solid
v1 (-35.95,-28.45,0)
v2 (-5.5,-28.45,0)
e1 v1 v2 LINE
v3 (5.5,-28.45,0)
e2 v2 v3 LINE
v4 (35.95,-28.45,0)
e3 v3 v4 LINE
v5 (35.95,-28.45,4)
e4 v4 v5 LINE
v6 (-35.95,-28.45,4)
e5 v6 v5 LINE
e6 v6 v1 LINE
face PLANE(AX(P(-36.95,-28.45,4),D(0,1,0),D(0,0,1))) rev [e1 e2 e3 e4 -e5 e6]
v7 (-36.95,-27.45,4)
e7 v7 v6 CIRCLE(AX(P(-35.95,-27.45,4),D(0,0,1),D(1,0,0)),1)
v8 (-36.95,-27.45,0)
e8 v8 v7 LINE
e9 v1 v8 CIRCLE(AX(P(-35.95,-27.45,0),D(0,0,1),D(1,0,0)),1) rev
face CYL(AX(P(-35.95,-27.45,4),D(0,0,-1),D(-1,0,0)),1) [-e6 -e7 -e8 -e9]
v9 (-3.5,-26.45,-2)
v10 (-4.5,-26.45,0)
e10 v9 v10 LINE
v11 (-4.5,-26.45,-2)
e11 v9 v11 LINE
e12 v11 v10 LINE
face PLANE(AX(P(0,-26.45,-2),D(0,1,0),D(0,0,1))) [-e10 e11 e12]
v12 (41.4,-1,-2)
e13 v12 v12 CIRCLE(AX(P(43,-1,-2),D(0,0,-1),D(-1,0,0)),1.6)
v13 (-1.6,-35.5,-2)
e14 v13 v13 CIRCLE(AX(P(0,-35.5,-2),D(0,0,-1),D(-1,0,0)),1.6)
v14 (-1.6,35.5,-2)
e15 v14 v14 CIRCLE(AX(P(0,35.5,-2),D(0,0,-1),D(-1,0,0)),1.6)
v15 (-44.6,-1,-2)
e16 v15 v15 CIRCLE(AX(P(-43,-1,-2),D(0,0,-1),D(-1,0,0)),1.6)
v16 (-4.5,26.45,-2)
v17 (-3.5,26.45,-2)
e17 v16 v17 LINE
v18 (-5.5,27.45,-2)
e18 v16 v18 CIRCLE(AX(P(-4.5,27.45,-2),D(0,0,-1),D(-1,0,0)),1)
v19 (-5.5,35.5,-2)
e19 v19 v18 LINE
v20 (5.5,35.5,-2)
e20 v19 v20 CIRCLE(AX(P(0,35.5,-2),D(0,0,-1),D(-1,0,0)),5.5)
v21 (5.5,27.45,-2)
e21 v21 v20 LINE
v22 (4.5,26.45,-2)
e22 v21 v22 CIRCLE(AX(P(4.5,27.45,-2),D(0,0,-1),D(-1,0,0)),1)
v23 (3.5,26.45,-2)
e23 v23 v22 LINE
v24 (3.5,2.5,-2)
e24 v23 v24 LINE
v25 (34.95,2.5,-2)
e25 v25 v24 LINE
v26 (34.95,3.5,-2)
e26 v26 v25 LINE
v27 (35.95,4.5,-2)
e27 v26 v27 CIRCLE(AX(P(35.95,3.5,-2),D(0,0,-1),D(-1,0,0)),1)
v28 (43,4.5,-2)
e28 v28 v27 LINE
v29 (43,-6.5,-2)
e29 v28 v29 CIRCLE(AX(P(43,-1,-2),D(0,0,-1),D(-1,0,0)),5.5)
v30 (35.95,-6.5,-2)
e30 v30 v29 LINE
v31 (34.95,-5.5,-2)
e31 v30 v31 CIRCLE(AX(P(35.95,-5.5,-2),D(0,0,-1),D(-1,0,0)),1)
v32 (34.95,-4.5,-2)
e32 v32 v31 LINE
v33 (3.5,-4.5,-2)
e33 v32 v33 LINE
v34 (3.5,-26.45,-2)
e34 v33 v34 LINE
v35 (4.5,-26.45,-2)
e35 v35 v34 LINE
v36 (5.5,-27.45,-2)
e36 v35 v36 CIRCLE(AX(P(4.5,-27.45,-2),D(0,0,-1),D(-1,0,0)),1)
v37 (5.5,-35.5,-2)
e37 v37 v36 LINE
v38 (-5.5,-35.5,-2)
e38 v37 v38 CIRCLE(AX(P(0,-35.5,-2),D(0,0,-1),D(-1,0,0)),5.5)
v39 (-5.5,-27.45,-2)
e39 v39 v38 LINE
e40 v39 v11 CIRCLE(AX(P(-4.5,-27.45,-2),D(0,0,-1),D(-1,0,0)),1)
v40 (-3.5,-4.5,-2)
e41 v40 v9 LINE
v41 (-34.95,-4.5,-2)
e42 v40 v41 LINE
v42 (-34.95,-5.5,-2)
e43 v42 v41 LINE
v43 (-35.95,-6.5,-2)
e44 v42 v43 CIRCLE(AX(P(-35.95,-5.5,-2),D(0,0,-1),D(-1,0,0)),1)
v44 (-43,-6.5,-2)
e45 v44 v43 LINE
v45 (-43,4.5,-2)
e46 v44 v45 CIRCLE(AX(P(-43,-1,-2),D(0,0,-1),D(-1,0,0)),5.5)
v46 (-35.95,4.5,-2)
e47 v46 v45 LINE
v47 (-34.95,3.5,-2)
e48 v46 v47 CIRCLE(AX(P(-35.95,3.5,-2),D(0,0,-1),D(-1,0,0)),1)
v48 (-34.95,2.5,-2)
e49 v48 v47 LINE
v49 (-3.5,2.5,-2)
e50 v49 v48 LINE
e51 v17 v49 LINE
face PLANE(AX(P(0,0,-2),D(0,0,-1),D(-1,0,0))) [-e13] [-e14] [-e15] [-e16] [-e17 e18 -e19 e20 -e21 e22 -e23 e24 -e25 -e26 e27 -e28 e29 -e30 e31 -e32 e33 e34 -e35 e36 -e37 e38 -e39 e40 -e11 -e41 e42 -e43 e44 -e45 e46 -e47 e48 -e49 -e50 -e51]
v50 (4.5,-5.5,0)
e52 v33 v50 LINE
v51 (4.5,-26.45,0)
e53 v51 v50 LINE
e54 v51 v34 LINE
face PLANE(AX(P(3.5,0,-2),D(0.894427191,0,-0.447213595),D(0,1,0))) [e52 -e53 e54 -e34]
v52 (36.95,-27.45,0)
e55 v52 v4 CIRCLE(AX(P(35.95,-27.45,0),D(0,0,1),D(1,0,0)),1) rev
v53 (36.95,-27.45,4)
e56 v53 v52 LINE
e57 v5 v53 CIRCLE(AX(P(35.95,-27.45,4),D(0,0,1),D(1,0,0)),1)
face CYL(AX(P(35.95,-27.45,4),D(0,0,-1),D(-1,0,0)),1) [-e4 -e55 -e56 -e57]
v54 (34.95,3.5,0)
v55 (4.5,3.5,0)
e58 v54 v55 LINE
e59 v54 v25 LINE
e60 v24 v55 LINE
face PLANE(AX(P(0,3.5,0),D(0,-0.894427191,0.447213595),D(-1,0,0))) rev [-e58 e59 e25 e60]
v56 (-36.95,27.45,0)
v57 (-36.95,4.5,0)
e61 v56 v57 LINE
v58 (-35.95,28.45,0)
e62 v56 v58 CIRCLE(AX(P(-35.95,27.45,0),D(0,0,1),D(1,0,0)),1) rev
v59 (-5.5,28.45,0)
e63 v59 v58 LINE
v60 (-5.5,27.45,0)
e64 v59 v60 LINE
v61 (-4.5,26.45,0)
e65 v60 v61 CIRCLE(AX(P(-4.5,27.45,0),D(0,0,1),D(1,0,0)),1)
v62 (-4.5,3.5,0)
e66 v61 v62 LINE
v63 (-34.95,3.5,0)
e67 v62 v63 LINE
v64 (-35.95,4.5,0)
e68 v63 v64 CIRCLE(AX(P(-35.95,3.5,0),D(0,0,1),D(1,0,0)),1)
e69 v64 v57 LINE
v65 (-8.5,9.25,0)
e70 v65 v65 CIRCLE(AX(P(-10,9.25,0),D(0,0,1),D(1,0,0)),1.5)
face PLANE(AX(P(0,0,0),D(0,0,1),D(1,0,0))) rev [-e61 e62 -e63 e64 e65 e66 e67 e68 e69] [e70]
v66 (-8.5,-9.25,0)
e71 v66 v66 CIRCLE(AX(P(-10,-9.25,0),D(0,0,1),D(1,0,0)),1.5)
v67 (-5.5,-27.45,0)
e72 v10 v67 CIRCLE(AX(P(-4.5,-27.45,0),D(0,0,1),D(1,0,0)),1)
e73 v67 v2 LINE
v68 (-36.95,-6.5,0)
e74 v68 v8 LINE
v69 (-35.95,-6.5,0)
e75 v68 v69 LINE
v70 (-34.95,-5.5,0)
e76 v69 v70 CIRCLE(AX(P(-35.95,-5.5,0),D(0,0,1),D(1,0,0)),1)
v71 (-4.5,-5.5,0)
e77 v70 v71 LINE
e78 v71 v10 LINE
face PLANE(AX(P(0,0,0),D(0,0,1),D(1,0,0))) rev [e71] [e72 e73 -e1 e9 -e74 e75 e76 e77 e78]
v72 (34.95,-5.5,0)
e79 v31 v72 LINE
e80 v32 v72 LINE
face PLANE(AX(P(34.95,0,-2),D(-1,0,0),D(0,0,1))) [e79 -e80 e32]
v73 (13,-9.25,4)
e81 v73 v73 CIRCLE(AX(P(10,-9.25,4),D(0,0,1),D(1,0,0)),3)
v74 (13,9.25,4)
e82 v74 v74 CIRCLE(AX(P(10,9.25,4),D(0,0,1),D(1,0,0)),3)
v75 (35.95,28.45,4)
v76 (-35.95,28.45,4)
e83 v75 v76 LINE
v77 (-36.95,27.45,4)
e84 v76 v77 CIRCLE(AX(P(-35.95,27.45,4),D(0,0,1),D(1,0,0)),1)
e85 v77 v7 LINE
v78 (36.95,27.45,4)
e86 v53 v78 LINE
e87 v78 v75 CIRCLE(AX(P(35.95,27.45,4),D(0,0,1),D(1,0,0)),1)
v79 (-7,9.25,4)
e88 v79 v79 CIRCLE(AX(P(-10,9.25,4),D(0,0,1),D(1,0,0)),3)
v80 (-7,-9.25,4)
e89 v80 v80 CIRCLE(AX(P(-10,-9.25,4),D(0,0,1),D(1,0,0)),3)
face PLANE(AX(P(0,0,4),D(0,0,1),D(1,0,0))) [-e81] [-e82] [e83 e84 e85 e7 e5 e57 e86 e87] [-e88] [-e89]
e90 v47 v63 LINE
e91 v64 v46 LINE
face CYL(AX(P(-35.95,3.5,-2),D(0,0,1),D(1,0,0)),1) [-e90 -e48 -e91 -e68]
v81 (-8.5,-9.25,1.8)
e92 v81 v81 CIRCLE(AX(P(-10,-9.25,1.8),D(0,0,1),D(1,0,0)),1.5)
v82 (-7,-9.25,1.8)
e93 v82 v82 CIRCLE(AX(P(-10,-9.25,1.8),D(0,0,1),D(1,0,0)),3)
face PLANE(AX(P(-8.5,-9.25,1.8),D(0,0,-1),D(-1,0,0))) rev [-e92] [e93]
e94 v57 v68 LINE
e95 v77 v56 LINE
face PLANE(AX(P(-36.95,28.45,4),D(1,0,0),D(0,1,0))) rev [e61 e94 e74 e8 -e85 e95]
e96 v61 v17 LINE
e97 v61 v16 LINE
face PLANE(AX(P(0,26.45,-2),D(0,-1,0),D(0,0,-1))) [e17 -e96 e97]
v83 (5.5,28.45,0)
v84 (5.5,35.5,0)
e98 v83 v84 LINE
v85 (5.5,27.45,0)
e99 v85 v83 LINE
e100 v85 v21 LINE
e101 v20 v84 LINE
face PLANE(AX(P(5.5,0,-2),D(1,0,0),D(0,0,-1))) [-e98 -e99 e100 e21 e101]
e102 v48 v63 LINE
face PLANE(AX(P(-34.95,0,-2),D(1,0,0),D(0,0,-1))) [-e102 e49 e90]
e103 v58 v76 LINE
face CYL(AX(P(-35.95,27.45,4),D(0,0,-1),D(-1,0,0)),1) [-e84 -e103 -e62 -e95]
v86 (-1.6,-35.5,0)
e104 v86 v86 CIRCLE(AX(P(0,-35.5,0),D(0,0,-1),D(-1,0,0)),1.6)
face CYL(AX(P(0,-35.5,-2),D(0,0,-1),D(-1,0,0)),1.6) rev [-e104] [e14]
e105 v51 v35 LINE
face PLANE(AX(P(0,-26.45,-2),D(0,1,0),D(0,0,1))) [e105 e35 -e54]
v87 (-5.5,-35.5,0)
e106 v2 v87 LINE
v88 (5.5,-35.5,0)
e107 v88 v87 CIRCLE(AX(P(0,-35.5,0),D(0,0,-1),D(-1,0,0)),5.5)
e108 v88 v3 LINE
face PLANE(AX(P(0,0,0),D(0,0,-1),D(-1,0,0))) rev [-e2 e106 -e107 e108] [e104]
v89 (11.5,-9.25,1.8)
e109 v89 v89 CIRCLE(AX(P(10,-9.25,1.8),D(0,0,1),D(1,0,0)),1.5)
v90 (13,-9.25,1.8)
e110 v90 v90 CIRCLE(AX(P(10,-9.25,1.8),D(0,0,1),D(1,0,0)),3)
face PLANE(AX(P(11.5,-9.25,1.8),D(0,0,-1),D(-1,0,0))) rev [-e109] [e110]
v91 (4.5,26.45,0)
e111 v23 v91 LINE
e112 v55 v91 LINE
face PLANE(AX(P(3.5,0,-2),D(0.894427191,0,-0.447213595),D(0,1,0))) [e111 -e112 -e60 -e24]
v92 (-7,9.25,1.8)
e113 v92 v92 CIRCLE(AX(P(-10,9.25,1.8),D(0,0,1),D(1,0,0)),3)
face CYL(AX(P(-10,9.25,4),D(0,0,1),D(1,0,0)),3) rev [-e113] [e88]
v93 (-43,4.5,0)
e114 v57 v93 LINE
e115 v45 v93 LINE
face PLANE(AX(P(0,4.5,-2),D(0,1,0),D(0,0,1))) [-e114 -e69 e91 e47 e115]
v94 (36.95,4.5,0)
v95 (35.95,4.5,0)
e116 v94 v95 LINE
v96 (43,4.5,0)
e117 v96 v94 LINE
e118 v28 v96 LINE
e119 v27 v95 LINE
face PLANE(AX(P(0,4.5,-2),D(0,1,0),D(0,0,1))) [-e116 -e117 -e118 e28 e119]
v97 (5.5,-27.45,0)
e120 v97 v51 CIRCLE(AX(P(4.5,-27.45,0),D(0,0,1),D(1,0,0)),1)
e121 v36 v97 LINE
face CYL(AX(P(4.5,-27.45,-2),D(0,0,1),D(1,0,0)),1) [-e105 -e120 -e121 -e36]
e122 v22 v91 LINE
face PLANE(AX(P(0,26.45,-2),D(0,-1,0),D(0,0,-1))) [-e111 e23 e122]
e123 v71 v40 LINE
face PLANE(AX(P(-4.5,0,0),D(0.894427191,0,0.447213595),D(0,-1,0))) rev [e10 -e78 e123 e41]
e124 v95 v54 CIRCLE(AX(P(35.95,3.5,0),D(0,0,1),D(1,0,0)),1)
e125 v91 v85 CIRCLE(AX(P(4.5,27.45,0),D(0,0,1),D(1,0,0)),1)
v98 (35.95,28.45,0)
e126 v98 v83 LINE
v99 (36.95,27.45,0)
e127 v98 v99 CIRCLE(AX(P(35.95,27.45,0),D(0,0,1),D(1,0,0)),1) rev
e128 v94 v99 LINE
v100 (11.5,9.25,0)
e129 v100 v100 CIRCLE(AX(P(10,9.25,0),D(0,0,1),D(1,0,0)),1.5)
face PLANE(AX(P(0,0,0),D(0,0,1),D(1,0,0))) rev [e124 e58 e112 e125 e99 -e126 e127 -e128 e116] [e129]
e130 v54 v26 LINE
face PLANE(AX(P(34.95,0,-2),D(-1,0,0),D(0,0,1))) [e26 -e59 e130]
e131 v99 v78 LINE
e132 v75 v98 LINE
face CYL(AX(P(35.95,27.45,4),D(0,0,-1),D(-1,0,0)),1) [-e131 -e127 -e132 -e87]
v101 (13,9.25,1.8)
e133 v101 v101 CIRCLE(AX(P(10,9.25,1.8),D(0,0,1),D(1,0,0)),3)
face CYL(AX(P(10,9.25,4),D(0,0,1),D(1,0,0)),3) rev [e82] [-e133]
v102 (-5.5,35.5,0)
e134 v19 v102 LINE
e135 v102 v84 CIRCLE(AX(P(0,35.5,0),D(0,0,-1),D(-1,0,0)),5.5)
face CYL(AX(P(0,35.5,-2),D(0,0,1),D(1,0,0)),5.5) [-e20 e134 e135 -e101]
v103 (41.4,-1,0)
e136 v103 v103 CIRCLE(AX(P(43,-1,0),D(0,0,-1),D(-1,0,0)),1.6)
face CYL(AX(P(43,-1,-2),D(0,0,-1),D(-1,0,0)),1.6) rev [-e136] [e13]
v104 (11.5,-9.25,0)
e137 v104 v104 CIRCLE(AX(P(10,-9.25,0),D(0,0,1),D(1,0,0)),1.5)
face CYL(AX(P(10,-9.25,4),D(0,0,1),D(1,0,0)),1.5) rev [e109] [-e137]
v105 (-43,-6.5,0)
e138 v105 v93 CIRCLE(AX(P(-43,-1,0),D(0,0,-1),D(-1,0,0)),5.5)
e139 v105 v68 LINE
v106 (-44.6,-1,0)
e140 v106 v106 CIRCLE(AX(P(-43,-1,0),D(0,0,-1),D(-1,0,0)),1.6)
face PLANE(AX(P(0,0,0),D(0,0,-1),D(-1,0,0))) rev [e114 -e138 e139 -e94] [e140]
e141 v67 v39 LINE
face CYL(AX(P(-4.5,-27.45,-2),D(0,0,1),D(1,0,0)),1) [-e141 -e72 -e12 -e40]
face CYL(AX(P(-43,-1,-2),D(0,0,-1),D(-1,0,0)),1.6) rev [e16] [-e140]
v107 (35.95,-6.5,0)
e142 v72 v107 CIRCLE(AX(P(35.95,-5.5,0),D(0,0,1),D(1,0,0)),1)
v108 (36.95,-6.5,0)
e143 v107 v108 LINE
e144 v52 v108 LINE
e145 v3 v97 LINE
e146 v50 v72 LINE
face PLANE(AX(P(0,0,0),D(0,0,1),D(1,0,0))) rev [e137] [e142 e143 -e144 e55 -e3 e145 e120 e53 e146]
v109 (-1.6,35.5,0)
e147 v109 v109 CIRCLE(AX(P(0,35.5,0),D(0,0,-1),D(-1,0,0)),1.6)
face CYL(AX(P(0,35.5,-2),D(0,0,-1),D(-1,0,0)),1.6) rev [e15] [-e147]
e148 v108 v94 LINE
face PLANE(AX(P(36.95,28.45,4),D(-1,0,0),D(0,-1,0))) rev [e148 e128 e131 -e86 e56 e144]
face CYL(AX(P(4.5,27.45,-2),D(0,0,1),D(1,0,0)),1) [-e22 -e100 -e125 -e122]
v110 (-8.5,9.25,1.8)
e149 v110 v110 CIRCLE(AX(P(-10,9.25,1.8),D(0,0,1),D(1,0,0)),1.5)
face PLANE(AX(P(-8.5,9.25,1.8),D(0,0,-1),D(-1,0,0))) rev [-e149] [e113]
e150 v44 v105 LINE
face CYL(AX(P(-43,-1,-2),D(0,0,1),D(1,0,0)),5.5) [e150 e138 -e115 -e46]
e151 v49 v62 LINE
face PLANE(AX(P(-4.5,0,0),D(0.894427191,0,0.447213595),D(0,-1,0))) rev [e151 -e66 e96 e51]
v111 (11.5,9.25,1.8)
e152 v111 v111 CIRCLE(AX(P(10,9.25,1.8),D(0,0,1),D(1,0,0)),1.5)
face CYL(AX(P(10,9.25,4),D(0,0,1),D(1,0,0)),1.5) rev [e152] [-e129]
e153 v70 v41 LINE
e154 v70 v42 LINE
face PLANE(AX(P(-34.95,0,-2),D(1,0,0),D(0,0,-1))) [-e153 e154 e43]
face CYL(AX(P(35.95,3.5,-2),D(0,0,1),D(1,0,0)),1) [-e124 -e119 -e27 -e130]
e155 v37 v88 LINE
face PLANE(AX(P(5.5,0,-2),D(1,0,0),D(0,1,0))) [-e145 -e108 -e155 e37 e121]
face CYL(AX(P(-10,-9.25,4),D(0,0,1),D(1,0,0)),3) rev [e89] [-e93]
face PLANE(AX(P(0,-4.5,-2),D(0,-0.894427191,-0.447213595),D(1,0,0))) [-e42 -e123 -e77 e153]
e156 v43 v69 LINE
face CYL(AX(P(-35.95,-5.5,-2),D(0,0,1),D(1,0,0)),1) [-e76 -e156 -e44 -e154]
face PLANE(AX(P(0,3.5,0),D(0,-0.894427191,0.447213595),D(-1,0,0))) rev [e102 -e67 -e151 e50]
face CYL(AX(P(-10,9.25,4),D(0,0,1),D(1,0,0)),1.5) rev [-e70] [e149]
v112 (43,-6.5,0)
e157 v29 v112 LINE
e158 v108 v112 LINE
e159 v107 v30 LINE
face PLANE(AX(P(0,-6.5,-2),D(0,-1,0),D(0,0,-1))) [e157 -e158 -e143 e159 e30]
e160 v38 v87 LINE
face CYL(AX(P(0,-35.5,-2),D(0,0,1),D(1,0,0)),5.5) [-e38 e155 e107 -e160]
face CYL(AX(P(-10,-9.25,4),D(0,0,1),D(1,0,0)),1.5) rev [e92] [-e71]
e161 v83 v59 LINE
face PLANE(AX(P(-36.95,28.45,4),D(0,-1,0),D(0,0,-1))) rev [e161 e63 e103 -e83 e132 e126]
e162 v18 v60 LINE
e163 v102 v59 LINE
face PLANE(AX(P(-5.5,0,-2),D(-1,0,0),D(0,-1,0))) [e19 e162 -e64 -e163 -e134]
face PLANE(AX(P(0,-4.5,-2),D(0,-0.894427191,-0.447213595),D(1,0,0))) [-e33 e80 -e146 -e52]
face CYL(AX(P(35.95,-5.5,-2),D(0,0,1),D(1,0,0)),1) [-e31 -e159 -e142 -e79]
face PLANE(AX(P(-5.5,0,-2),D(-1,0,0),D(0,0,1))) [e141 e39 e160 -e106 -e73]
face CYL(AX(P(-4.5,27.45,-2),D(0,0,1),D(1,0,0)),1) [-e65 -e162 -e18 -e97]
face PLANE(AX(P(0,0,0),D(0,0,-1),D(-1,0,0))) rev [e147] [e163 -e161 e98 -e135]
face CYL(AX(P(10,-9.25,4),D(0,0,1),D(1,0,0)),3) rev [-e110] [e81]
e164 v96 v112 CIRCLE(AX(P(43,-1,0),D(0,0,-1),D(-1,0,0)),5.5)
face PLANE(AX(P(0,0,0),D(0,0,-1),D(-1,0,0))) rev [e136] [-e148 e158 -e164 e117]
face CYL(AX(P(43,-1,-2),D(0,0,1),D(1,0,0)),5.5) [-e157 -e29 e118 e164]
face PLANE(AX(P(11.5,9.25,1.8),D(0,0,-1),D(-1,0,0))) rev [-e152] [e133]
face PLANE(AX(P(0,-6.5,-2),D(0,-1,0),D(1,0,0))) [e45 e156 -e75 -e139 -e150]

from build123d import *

# Parameters (mm, degrees)
SKETCH_1_W                = 73.9
SKETCH_1_H                = 56.9
EXTRUDE_1_DEPTH           = 4
HOLE_WIZARD_1_D           = 3
HOLE_WIZARD_1_CBORE_D     = 6
HOLE_WIZARD_1_CBORE_DEPTH = 2.2
SKETCH_4_W                = 7
SKETCH_4_H                = 25.95
SKETCH_4_W_2              = 33.45
SKETCH_4_H_2              = 7
SKETCH_4_H_3              = 23.95
EXTRUDE_2_DEPTH           = 2
HOLE_WIZARD_2_D           = 3.2
CHAMFER_1_SIZE            = 1
CHAMFER_1_SIZE_2          = 2
CHAMFER_2_SIZE            = 2
CHAMFER_2_SIZE_2          = 1
CHAMFER_3_SIZE            = 2
CHAMFER_3_SIZE_2          = 1
SKETCH_7_W                = 2
SKETCH_7_H                = 1
SKETCH_7_W_2              = 1
SKETCH_7_H_2              = 2
EXTRUDE_3_DEPTH           = 2
FILLET_3_R                = 1
FILLET_4_R                = 1


with BuildPart() as part:
    # 草图1 → 凸台-拉伸1 (new body)
    with BuildSketch(Plane.XY):
        Rectangle(SKETCH_1_W, SKETCH_1_H)
    extrude(amount=EXTRUDE_1_DEPTH)

    # 孔1 (through all)
    with Locations(Plane(origin=(-10, 9.25, 4), x_dir=(1, 0, 0), z_dir=(0, 0, 1))):
        with Locations((0, 0), (20, 0), (20, -18.5), (0, -18.5)):
            CounterBoreHole(HOLE_WIZARD_1_D / 2, HOLE_WIZARD_1_CBORE_D / 2, HOLE_WIZARD_1_CBORE_DEPTH)

    # 草图4 → 凸台-拉伸2 (add)
    with BuildSketch(Plane(origin=(0, 0, 0), x_dir=(-1, 0, 0), z_dir=(0, 0, -1))):
        with BuildLine():
            Line((3.5, 28.45), (3.5, 35.5))
            ThreePointArc((3.5, 35.5), (0, 39), (-3.5, 35.5))
            Line((-3.5, 35.5), (-3.5, 28.45))
            Line((-3.5, 28.45), (3.5, 28.45))
        make_face()
        with Locations((0, 15.475)):
            Rectangle(SKETCH_4_W, SKETCH_4_H)
        with Locations((20.225, -1)):
            Rectangle(SKETCH_4_W_2, SKETCH_4_H_2)
        with BuildLine():
            Line((43, 2.5), (36.95, 2.5))
            Line((36.95, 2.5), (36.95, -4.5))
            Line((36.95, -4.5), (43, -4.5))
            ThreePointArc((43, -4.5), (46.5, -1), (43, 2.5))
        make_face()
        with Locations((0, -1)):
            Rectangle(SKETCH_4_W, SKETCH_4_H_2)
        with Locations((-20.225, -1)):
            Rectangle(SKETCH_4_W_2, SKETCH_4_H_2)
        with Locations((0, -16.475)):
            Rectangle(SKETCH_4_W, SKETCH_4_H_3)
        with BuildLine():
            Line((-36.95, -4.5), (-36.95, 2.5))
            Line((-36.95, 2.5), (-43, 2.5))
            ThreePointArc((-43, 2.5), (-46.5, -1), (-43, -4.5))
            Line((-43, -4.5), (-36.95, -4.5))
        make_face()
        with BuildLine():
            Line((3.5, -35.5), (3.5, -28.45))
            Line((3.5, -28.45), (-3.5, -28.45))
            Line((-3.5, -28.45), (-3.5, -35.5))
            ThreePointArc((-3.5, -35.5), (0, -39), (3.5, -35.5))
        make_face()
    extrude(amount=EXTRUDE_2_DEPTH)

    # 孔2 (through all)
    with Locations(Plane(origin=(43, -1, -2), x_dir=(-1, 0, 0), z_dir=(0, 0, -1))):
        with Locations((0, 0), (43, 36.5), (86, 0), (43, -34.5)):
            Hole(HOLE_WIZARD_2_D / 2)

    # 倒角1
    # the kernel refuses this chamfer: 2, 1 mm, written as the material it adds along each edge
    with BuildSketch(Plane(origin=(-3.5, -2.679657748, 0), x_dir=(-0.9976223042390326, 0, 0.06891834360170879), z_dir=(0, 1, 0))) as chamfer_1_piece_1:
        Polygon((CHAMFER_1_SIZE * 0.997622304239, -CHAMFER_1_SIZE * 0.0689183436017), (-CHAMFER_1_SIZE_2 * 0.0689183436017, -CHAMFER_1_SIZE_2 * 0.997622304239), (0, 0), align=None)
    extrude(amount=31.129657748)
    with BuildSketch(Plane(origin=(-36.95, 2.5, 0), x_dir=(0, 0.9976223042390326, 0.06891834360170879), z_dir=(1, 0, 0))) as chamfer_1_piece_2:
        Polygon((CHAMFER_1_SIZE * 0.997622304239, -CHAMFER_1_SIZE * 0.0689183436017), (-CHAMFER_1_SIZE_2 * 0.0689183436017, -CHAMFER_1_SIZE_2 * 0.997622304239), (0, 0), align=None)
    extrude(amount=38.629657748)

    # 倒角2
    # the kernel refuses this chamfer: 2, 1 mm, written as the material it adds along each edge
    with BuildSketch(Plane(origin=(-3.5, 0.679657748, 0), x_dir=(0.017268075123668084, 0, -0.9998508956747119), z_dir=(0, -1, 0))) as chamfer_2_piece_1:
        Polygon((CHAMFER_2_SIZE * 0.999850895675, -CHAMFER_2_SIZE * 0.0172680751237), (-CHAMFER_2_SIZE_2 * 0.0172680751237, -CHAMFER_2_SIZE_2 * 0.999850895675), (0, 0), align=None)
    extrude(amount=29.129657748)
    with BuildSketch(Plane(origin=(-36.95, -4.5, 0), x_dir=(0, 0.017268075123667872, -0.9998508956747119), z_dir=(1, 0, 0))) as chamfer_2_piece_2:
        Polygon((CHAMFER_2_SIZE * 0.999850895675, -CHAMFER_2_SIZE * 0.0172680751237), (-CHAMFER_2_SIZE_2 * 0.0172680751237, -CHAMFER_2_SIZE_2 * 0.999850895675), (0, 0), align=None)
    extrude(amount=38.629657748)

    # 倒角3
    # the kernel refuses this chamfer: 2, 1 mm, written as the material it adds along each edge
    with BuildSketch(Plane(origin=(3.5, -28.45, 0), x_dir=(-0.0172680751236683, 0, -0.9998508956747119), z_dir=(0, 1, 0))) as chamfer_3_piece_1:
        Polygon((CHAMFER_3_SIZE * 0.999850895675, -CHAMFER_3_SIZE * 0.0172680751237), (-CHAMFER_3_SIZE_2 * 0.0172680751237, -CHAMFER_3_SIZE_2 * 0.999850895675), (0, 0), align=None)
    extrude(amount=29.129657748)
    with BuildSketch(Plane(origin=(-1.679657748, -4.5, 0), x_dir=(0, 0.0172680751236683, -0.9998508956747119), z_dir=(1, 0, 0)), Plane(origin=(36.95, 2.5, 0), x_dir=(0, -0.017268075123667872, -0.9998508956747119), z_dir=(-1, 0, 0))) as chamfer_3_piece_2:
        Polygon((CHAMFER_3_SIZE * 0.999850895675, -CHAMFER_3_SIZE * 0.0172680751237), (-CHAMFER_3_SIZE_2 * 0.0172680751237, -CHAMFER_3_SIZE_2 * 0.999850895675), (0, 0), align=None)
    extrude(amount=38.629657748)
    with BuildSketch(Plane(origin=(3.5, -2.679657748, 0), x_dir=(-0.017268075123668084, 0, -0.9998508956747119), z_dir=(0, 1, 0))) as chamfer_3_piece_3:
        Polygon((CHAMFER_3_SIZE * 0.999850895675, -CHAMFER_3_SIZE * 0.0172680751237), (-CHAMFER_3_SIZE_2 * 0.0172680751237, -CHAMFER_3_SIZE_2 * 0.999850895675), (0, 0), align=None)
    extrude(amount=31.129657748)

    # 草图7 → 凸台-拉伸3 (add)
    # profile 1 of 6: a face of its own
    with BuildSketch(Plane(origin=(0, 0, 0), x_dir=(-1, 0, 0), z_dir=(0, 0, -1))):
        with BuildLine():
            Line((-36.95, 4.5), (-43, 4.5))
            ThreePointArc((-43, 4.5), (-48.5, -1), (-43, -6.5))
            Line((-43, -6.5), (-34.95, -6.5))
            Line((-34.95, -6.5), (-34.95, 3.5))
            Line((-34.95, 3.5), (-36.95, 3.5))
            Line((-36.95, 3.5), (-36.95, 4.5))
        make_face()
        with BuildLine():
            Line((-43, 2.5), (-36.95, 2.5))
            Line((-36.95, 2.5), (-36.95, -4.5))
            Line((-36.95, -4.5), (-43, -4.5))
            ThreePointArc((-43, -4.5), (-46.5, -1), (-43, 2.5))
        make_face(mode=Mode.SUBTRACT)
    # profile 2 of 6: a face of its own
    with BuildSketch(Plane(origin=(0, 0, 0), x_dir=(-1, 0, 0), z_dir=(0, 0, -1))):
        with Locations((-35.95, 4)):
            Rectangle(SKETCH_7_W, SKETCH_7_H)
    # profile 3 of 6: a face of its own
    with BuildSketch(Plane(origin=(0, 0, 0), x_dir=(-1, 0, 0), z_dir=(0, 0, -1))):
        with BuildLine():
            Line((-5.5, -35.5), (-5.5, -26.45))
            Line((-5.5, -26.45), (5.5, -26.45))
            Line((5.5, -26.45), (5.5, -35.5))
            ThreePointArc((5.5, -35.5), (0, -41), (-5.5, -35.5))
        make_face()
        with BuildLine():
            ThreePointArc((-3.5, -35.5), (0, -39), (3.5, -35.5))
            Line((3.5, -35.5), (3.5, -28.45))
            Line((3.5, -28.45), (-3.5, -28.45))
            Line((-3.5, -28.45), (-3.5, -35.5))
        make_face(mode=Mode.SUBTRACT)
    # profile 4 of 6: a face of its own
    with BuildSketch(Plane(origin=(0, 0, 0), x_dir=(-1, 0, 0), z_dir=(0, 0, -1))):
        with BuildLine():
            Line((43, -6.5), (34.95, -6.5))
            Line((34.95, -6.5), (34.95, 4.5))
            Line((34.95, 4.5), (43, 4.5))
            ThreePointArc((43, 4.5), (48.5, -1), (43, -6.5))
        make_face()
        with BuildLine():
            ThreePointArc((43, -4.5), (46.5, -1), (43, 2.5))
            Line((43, 2.5), (36.95, 2.5))
            Line((36.95, 2.5), (36.95, -4.5))
            Line((36.95, -4.5), (43, -4.5))
        make_face(mode=Mode.SUBTRACT)
    # profile 5 of 6: a face of its own
    with BuildSketch(Plane(origin=(0, 0, 0), x_dir=(-1, 0, 0), z_dir=(0, 0, -1))):
        with BuildLine():
            Line((-5.5, 35.5), (-5.5, 28.45))
            Line((-5.5, 28.45), (-4.5, 28.45))
            Line((-4.5, 28.45), (-4.5, 26.45))
            Line((-4.5, 26.45), (5.5, 26.45))
            Line((5.5, 26.45), (5.5, 35.5))
            ThreePointArc((5.5, 35.5), (0, 41), (-5.5, 35.5))
        make_face()
        with BuildLine():
            Line((3.5, 35.5), (3.5, 28.45))
            Line((3.5, 28.45), (-3.5, 28.45))
            Line((-3.5, 28.45), (-3.5, 35.5))
            ThreePointArc((-3.5, 35.5), (0, 39), (3.5, 35.5))
        make_face(mode=Mode.SUBTRACT)
    # profile 6 of 6: a face of its own
    with BuildSketch(Plane(origin=(0, 0, 0), x_dir=(-1, 0, 0), z_dir=(0, 0, -1))):
        with Locations((-5, 27.45)):
            Rectangle(SKETCH_7_W_2, SKETCH_7_H_2)
    extrude(amount=EXTRUDE_3_DEPTH)

    # 圆角3
    fillet_3_edges = [part.edges().sort_by_distance(p)[0] for p in [
        (-34.95, -6.5, -1),
        (-34.95, 4.5, -1),
        (5.5, -26.45, -1),
        (-5.5, -26.45, -1),
        (-5.5, 26.45, -1),
        (5.5, 26.45, -1),
        (34.95, 4.5, -1),
        (34.95, -6.5, -1),
    ]]
    fillet(fillet_3_edges, radius=FILLET_3_R)

    # 圆角4
    fillet_4_edges = [part.edges().sort_by_distance(p)[0] for p in [
        (36.95, -28.45, 2),
        (-36.95, -28.45, 2),
        (-36.95, 28.45, 2),
        (36.95, 28.45, 2),
    ]]
    fillet(fillet_4_edges, radius=FILLET_4_R)


solid = part.part
